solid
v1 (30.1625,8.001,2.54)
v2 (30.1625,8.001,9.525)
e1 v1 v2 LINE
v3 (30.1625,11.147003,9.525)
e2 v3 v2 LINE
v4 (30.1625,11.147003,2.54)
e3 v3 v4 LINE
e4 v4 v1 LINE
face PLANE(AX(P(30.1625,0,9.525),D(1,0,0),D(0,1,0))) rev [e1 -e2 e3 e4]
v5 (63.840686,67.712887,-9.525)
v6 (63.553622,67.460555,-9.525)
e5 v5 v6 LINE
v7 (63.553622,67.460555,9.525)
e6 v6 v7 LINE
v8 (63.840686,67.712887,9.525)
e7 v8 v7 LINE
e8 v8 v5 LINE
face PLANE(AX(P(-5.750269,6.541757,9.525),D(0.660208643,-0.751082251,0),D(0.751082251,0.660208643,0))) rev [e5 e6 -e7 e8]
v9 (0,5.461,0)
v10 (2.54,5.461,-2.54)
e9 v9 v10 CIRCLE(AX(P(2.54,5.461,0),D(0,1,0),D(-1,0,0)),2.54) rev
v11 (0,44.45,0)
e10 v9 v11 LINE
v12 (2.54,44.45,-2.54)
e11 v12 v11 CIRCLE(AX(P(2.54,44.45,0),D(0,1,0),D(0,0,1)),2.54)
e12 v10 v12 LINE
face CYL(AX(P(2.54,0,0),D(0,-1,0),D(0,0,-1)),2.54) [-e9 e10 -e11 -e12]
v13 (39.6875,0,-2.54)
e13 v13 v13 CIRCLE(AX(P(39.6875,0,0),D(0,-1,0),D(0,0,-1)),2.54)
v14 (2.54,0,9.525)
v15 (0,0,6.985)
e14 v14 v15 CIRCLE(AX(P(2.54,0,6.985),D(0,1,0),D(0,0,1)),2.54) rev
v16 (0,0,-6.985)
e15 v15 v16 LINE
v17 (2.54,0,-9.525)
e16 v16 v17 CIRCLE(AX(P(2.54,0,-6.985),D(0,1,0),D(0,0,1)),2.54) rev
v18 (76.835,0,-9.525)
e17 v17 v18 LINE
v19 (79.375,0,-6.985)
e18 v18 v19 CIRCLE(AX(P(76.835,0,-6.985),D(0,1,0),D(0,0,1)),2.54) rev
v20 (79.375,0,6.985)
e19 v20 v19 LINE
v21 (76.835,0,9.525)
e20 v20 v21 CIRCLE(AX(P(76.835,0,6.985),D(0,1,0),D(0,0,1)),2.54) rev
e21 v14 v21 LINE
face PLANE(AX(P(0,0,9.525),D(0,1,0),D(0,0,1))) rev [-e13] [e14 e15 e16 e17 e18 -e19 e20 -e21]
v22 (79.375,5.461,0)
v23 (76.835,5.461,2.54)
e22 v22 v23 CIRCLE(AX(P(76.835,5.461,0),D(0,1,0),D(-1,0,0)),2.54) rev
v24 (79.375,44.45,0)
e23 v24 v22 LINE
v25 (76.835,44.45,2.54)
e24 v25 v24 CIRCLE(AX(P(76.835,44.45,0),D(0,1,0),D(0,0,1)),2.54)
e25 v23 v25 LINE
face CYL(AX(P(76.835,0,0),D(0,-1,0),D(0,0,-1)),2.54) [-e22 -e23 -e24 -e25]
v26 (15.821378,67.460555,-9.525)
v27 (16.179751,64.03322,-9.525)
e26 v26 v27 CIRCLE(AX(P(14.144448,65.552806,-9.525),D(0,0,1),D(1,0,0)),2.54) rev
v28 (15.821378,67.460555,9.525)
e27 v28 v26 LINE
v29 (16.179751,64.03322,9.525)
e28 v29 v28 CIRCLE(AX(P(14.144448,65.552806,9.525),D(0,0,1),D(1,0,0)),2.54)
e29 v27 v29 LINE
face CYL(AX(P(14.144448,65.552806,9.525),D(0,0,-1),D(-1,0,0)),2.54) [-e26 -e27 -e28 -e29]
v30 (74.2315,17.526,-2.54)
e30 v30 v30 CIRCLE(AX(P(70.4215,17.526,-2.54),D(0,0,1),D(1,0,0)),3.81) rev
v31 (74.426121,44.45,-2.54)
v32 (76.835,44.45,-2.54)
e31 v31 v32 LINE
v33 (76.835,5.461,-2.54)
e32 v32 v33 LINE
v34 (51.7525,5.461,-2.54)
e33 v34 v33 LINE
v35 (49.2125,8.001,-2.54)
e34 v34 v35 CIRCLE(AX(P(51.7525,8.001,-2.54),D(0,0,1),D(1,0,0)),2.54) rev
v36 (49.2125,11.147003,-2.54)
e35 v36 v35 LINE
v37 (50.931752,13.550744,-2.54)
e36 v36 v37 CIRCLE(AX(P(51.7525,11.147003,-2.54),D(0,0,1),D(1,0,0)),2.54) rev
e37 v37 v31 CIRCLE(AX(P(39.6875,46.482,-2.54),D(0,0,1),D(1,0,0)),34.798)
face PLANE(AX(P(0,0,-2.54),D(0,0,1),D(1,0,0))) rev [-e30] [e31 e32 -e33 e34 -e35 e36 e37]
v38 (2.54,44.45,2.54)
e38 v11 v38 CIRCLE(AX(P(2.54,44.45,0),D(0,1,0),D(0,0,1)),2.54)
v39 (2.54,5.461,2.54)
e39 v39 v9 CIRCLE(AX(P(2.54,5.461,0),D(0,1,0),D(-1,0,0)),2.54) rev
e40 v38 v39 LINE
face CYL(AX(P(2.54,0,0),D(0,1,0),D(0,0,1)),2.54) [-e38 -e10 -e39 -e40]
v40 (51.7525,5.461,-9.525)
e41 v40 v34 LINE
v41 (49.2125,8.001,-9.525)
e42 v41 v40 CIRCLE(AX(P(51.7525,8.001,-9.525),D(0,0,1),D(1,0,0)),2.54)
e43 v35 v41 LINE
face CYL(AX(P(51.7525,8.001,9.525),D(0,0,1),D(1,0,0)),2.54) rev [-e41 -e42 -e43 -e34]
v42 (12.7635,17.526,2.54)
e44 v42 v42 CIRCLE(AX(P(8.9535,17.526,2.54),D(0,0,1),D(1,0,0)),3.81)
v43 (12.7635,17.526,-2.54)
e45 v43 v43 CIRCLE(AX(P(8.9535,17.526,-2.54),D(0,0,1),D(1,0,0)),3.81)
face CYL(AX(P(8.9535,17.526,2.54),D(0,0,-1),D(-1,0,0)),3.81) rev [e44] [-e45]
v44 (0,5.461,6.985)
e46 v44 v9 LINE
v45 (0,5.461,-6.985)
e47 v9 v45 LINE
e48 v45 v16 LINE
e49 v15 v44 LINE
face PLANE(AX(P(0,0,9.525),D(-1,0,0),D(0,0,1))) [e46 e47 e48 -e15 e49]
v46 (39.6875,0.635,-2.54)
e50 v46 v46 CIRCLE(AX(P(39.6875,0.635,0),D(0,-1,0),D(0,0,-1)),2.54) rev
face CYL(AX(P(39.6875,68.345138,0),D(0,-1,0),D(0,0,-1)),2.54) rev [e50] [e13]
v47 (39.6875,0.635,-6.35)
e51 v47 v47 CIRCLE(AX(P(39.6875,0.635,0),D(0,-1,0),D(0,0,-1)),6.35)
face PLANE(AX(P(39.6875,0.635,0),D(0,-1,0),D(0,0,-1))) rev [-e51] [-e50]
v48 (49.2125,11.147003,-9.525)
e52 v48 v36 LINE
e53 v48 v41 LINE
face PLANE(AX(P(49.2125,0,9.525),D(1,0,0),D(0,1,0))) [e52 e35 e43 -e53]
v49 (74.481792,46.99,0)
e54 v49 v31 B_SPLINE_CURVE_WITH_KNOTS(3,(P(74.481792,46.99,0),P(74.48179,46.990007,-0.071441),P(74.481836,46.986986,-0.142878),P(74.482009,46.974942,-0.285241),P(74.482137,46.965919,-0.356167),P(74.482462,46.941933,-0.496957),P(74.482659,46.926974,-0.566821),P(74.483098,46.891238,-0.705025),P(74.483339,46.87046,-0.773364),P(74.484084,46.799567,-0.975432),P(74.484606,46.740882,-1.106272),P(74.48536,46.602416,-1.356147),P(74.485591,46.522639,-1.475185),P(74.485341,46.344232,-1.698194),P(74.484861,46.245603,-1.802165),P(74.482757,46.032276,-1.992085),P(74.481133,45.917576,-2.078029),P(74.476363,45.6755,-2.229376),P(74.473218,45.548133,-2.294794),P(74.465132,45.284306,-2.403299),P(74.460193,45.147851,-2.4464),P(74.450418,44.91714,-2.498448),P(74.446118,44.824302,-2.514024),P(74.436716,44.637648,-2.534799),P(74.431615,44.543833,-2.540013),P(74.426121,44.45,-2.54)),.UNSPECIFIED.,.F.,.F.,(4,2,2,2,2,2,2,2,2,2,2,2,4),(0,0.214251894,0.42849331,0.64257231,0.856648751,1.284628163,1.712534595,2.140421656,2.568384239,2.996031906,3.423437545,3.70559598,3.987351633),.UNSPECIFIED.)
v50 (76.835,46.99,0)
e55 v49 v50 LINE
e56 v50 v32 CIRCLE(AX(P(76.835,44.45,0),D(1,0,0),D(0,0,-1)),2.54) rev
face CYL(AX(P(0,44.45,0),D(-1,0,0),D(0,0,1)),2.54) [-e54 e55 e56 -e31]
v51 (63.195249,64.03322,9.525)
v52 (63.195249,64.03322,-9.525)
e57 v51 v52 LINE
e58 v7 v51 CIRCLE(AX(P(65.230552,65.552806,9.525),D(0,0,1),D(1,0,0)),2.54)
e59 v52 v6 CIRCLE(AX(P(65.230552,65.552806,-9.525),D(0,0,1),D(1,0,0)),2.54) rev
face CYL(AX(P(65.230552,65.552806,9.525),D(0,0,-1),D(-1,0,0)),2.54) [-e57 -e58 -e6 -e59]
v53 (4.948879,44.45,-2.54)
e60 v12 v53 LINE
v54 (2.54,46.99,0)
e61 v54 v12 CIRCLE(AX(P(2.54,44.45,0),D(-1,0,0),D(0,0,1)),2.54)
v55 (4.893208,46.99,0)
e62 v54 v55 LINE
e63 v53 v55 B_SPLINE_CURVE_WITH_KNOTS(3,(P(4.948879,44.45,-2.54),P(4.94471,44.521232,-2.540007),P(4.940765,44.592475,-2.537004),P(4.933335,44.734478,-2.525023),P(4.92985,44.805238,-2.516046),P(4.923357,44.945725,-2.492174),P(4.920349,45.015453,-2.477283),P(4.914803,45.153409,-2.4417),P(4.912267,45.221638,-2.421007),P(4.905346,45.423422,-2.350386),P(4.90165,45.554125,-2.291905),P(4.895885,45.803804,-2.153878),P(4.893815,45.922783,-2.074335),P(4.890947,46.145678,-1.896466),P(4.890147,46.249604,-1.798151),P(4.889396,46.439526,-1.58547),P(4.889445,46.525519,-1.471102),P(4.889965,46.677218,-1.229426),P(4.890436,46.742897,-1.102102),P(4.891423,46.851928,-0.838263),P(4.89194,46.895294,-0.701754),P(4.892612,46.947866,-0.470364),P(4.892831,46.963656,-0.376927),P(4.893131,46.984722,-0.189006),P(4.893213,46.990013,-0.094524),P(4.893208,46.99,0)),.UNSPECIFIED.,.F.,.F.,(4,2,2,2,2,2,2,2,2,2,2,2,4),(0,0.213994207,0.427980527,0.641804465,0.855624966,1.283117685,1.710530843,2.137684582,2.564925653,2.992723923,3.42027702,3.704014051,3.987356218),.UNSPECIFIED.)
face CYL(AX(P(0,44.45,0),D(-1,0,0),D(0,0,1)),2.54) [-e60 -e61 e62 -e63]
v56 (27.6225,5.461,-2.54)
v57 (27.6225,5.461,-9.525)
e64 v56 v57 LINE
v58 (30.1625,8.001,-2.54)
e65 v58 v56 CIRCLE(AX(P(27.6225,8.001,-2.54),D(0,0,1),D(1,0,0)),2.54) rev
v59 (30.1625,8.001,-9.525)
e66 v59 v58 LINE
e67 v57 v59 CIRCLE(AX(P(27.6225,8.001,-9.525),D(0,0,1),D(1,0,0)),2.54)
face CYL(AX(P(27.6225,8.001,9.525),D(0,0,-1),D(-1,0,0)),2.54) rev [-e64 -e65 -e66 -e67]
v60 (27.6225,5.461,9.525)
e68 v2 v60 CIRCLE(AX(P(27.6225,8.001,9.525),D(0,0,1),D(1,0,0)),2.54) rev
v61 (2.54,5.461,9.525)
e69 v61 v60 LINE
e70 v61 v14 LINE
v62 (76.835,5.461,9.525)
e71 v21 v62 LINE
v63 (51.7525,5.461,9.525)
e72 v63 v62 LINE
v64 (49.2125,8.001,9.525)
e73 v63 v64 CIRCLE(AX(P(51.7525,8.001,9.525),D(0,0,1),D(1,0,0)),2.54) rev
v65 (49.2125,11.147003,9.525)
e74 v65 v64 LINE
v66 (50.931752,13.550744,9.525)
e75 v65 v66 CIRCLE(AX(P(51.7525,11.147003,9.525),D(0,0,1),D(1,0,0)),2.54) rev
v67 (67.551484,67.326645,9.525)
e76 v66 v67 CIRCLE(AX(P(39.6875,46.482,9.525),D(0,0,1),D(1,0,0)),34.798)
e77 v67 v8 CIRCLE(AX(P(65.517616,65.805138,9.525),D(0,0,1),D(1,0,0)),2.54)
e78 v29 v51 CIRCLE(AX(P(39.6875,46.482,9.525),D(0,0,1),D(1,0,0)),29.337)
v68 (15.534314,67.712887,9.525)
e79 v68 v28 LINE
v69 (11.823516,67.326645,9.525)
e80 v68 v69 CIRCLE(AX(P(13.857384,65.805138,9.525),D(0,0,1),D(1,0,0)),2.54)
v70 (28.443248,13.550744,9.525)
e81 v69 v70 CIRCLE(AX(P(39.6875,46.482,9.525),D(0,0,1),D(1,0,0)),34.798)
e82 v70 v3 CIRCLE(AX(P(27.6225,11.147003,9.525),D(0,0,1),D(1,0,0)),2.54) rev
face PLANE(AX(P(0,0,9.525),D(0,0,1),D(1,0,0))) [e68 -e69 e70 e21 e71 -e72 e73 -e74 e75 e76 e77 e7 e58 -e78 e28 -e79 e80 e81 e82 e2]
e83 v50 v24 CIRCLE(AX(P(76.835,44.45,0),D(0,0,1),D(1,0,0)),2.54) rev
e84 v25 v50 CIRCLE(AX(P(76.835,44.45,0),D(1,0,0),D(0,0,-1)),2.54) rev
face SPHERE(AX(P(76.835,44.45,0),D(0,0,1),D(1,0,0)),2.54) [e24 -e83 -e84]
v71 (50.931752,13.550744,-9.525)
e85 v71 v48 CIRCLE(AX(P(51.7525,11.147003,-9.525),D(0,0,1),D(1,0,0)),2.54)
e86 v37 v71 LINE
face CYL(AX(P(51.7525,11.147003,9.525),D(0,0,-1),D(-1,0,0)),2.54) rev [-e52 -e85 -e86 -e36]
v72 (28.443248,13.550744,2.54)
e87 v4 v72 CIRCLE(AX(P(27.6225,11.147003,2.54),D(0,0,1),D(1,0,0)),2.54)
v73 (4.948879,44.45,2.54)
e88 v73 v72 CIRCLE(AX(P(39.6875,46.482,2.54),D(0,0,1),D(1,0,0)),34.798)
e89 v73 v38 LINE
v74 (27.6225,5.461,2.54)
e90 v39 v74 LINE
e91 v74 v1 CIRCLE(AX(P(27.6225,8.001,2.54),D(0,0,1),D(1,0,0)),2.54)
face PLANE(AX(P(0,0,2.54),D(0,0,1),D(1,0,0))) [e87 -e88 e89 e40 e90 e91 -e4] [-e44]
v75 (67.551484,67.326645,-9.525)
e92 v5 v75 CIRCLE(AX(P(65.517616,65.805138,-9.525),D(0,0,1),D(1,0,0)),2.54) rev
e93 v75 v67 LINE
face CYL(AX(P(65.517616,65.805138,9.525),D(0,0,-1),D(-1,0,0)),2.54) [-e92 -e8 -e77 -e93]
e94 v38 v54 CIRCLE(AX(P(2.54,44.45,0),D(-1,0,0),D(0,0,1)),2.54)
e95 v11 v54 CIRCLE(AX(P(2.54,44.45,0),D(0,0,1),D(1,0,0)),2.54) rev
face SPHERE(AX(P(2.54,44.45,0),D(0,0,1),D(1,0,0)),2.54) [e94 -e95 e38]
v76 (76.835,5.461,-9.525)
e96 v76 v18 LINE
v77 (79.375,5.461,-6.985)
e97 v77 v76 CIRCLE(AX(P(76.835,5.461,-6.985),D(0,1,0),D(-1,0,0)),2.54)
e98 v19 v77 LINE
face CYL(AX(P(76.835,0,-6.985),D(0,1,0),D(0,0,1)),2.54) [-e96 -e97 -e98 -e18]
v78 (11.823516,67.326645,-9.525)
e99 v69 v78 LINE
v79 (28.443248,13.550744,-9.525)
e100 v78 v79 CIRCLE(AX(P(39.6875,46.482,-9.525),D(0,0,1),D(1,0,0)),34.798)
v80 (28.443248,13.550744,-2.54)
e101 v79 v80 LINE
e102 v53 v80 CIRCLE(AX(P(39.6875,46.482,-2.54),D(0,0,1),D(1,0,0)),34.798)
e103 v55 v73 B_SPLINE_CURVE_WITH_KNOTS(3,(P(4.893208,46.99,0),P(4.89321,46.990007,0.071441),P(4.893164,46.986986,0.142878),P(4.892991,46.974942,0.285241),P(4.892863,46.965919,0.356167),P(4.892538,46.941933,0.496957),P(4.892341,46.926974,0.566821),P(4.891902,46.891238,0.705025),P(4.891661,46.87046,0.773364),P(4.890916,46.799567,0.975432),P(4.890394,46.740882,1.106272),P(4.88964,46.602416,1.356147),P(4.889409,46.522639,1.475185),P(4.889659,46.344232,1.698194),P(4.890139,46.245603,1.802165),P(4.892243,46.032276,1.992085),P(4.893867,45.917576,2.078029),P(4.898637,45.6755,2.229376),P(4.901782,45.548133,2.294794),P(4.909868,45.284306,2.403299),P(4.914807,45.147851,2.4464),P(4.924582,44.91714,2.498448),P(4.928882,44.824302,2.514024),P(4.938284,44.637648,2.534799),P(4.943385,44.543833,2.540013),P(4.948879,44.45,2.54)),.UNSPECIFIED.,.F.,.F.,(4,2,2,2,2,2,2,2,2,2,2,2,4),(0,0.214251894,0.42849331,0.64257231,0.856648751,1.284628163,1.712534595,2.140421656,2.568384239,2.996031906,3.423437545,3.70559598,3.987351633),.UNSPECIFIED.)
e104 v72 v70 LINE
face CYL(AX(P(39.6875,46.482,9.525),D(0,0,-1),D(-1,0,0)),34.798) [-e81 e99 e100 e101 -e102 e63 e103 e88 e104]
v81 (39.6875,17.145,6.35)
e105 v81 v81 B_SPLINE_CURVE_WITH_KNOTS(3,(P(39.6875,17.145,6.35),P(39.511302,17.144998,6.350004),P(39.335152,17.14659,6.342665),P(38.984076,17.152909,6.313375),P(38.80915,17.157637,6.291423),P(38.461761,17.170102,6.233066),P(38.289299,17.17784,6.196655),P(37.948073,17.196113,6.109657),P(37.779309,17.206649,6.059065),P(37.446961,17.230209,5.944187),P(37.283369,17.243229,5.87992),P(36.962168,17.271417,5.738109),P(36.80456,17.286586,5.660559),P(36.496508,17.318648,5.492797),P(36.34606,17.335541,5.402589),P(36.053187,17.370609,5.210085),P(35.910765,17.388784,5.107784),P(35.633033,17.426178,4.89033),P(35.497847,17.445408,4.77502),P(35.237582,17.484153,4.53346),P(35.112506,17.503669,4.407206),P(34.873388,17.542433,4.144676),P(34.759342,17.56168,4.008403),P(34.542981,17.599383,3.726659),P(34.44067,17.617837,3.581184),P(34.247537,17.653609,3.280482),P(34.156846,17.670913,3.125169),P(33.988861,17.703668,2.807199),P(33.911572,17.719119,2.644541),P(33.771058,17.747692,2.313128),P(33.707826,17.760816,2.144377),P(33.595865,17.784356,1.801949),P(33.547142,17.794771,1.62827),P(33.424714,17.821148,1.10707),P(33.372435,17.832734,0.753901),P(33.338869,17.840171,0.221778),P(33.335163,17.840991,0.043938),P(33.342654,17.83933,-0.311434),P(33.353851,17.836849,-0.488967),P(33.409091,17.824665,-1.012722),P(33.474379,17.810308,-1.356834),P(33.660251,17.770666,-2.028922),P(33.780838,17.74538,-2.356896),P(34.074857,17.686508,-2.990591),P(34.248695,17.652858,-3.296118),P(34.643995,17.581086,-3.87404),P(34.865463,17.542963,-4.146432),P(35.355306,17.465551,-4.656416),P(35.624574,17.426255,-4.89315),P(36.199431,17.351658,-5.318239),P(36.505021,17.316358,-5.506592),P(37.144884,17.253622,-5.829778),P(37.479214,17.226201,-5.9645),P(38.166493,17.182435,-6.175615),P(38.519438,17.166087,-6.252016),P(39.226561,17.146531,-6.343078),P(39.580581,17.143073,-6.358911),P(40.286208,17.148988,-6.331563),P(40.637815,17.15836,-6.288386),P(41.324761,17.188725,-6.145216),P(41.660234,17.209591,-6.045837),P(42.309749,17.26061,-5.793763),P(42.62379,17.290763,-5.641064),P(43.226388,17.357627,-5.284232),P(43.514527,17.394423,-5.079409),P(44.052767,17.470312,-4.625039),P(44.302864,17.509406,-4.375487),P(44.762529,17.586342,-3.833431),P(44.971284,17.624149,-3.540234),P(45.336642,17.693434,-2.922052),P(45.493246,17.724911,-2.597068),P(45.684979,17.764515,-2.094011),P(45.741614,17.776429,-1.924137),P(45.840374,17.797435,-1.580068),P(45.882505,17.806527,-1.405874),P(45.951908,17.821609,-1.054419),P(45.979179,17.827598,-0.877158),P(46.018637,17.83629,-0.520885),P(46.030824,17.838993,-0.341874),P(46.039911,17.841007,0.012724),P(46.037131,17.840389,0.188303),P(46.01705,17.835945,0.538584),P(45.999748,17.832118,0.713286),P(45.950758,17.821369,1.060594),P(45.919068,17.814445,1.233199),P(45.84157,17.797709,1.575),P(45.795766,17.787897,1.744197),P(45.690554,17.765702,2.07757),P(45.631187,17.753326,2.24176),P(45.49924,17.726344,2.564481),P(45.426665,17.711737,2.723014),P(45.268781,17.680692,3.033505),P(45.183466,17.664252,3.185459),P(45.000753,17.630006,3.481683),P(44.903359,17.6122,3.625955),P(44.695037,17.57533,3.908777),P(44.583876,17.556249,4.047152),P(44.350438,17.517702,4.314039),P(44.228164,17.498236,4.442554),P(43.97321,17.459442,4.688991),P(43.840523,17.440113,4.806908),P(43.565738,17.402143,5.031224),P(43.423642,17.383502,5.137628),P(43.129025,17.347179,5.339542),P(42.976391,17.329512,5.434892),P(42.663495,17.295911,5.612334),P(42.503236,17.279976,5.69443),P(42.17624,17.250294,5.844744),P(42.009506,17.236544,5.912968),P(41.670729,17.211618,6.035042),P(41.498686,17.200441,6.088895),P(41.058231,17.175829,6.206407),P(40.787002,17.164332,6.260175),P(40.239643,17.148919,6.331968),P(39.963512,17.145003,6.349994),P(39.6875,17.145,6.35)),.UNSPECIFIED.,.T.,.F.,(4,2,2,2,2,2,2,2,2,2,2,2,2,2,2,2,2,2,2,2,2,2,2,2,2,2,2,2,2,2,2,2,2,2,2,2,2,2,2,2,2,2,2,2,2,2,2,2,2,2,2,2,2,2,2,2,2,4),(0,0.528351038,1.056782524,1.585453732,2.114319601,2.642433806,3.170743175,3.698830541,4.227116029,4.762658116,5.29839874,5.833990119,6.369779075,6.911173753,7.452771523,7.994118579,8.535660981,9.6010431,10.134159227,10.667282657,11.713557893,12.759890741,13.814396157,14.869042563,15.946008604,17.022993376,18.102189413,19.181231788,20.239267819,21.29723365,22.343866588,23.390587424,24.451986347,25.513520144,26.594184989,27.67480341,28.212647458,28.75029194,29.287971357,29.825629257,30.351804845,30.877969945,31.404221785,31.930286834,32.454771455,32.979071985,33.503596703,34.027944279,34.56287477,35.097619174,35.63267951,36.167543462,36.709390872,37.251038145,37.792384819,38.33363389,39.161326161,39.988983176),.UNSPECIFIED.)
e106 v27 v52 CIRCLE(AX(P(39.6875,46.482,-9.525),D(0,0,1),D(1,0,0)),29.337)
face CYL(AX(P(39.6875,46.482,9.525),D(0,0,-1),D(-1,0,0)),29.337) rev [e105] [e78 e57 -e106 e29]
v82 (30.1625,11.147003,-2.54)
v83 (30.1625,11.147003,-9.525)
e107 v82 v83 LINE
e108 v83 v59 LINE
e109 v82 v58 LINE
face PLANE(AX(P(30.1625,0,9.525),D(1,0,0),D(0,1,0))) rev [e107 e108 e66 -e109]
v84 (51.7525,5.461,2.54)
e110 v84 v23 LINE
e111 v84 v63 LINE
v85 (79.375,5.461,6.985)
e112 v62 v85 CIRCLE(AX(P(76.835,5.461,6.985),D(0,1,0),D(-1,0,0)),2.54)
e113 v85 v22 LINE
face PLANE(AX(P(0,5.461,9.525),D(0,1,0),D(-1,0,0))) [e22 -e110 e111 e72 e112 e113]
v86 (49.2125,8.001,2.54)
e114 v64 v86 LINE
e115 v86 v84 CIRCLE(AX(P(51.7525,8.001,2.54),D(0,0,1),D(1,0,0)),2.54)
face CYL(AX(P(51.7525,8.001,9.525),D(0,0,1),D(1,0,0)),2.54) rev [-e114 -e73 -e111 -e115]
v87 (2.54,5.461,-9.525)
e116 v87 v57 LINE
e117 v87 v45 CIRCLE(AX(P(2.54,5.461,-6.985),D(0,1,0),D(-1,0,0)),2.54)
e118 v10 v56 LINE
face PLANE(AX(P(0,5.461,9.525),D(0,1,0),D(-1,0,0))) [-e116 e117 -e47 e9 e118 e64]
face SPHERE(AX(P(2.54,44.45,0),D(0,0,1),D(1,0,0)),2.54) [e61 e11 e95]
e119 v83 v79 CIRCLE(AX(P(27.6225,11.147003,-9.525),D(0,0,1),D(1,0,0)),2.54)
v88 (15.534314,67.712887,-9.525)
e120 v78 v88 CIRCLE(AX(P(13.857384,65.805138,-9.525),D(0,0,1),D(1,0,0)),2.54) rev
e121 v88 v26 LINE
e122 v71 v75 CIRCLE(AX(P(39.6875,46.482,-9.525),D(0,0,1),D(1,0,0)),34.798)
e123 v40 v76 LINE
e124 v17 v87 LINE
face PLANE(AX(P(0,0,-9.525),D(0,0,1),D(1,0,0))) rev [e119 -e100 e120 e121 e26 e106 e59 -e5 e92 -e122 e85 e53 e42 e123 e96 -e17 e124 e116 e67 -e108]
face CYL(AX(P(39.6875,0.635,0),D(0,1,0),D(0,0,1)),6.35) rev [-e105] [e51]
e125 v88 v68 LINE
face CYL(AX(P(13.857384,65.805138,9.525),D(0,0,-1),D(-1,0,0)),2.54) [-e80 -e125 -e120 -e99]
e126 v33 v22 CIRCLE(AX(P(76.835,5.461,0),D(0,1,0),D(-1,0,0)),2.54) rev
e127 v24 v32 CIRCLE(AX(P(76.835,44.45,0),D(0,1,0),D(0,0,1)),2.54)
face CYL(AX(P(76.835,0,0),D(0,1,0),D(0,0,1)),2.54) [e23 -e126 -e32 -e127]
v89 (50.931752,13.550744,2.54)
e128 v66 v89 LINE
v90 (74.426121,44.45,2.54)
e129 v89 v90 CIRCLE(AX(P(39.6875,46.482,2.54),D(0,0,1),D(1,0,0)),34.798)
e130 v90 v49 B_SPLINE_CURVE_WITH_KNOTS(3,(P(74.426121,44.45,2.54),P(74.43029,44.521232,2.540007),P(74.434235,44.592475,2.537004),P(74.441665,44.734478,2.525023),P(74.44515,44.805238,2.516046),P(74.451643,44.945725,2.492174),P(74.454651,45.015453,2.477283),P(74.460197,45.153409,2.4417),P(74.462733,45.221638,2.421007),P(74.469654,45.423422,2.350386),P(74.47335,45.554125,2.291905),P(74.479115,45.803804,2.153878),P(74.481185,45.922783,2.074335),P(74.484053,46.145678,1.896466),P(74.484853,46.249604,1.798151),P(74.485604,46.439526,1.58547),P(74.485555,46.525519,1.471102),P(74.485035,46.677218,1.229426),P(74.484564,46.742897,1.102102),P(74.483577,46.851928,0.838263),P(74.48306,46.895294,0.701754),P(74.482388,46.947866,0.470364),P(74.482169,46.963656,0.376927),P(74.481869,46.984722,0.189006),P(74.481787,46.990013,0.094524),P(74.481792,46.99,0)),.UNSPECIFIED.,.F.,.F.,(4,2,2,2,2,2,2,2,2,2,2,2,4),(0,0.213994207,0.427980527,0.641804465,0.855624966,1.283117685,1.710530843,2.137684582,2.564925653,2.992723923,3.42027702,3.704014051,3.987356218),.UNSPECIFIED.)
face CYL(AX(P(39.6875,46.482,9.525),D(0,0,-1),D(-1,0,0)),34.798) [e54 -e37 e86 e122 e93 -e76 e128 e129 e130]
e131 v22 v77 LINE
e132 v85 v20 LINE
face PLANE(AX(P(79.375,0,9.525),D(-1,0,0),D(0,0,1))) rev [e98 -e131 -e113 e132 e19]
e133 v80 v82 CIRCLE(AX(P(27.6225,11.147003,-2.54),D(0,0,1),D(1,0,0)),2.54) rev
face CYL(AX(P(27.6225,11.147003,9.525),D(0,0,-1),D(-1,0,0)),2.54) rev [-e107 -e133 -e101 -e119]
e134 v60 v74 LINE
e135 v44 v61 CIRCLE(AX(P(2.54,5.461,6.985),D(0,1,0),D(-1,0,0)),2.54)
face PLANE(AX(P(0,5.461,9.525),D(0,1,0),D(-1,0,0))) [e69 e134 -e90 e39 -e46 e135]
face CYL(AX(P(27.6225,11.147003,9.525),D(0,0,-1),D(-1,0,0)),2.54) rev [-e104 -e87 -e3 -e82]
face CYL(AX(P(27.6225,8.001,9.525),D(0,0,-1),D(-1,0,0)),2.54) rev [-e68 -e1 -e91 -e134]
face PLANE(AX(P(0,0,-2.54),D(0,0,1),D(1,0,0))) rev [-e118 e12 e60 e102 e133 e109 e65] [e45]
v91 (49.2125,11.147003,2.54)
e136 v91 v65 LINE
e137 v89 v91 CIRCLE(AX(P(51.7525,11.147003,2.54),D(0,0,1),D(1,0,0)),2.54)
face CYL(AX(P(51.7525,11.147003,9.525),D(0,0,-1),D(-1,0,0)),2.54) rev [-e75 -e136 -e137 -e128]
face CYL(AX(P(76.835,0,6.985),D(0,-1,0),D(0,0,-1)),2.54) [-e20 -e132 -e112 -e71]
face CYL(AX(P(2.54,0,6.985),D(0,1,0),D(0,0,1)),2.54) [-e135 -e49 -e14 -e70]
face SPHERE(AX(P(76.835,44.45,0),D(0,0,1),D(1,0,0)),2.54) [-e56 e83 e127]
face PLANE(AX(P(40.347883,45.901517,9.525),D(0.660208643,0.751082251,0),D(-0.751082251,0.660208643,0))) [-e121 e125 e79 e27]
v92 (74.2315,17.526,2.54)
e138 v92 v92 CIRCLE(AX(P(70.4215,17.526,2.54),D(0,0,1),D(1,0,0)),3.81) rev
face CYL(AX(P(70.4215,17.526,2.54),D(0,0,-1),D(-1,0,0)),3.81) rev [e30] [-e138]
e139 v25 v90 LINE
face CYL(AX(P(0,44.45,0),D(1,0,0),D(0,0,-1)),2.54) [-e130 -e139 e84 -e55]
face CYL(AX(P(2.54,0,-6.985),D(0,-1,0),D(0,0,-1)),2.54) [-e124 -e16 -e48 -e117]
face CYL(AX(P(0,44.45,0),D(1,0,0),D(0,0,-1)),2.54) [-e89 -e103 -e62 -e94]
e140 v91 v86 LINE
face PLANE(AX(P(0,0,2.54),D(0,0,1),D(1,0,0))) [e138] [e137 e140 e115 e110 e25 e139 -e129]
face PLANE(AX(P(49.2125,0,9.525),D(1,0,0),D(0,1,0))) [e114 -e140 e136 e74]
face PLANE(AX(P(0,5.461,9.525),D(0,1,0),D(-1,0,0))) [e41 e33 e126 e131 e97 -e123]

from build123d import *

# Parameters (mm, degrees)
BOSS_EXTRUDE1_DEPTH = 9.525
SKETCH1_3_R         = 3.81
BOSS_EXTRUDE2_DEPTH = 2.54
FILLET1_R           = 2.54
SKETCH2_R           = 2.54
CUT_EXTRUDE1_DEPTH  = 106.176870727
SKETCH7_R           = 6.35
CUT_EXTRUDE2_DEPTH  = 18.415
FILLET2_R           = 2.54
FILLET3_R           = 2.54


with BuildPart() as part:
    # Sketch1 → Boss-Extrude1 (new, symmetric)
    with BuildSketch(Plane.XY):
        with BuildLine():
            ThreePointArc((61.722, 65.850540956), (66.416458594, 34.38975697), (39.6875, 17.145))
            Line((39.6875, 17.145), (39.6875, 0))
            Line((39.6875, 0), (79.375, 0))
            Line((79.375, 0), (79.375, 5.461))
            Line((79.375, 5.461), (49.2125, 5.461))
            Line((49.2125, 5.461), (49.2125, 13.012981804))
            ThreePointArc((49.2125, 13.012981804), (67.609880758, 25.71564604), (74.481791773, 46.99))
            ThreePointArc((74.481791773, 46.99), (72.157634164, 58.995640214), (65.823660173, 69.455940354))
            Line((65.823660173, 69.455940354), (61.722, 65.850540956))
        make_face()
        with BuildLine():
            Line((39.6875, 0), (39.6875, 17.145))
            ThreePointArc((39.6875, 17.145), (12.958541406, 34.38975697), (17.653, 65.850540956))
            Line((17.653, 65.850540956), (13.551339827, 69.455940354))
            ThreePointArc((13.551339827, 69.455940354), (7.217365836, 58.995640214), (4.893208227, 46.99))
            ThreePointArc((4.893208227, 46.99), (11.765119242, 25.71564604), (30.1625, 13.012981804))
            Line((30.1625, 13.012981804), (30.1625, 5.461))
            Line((30.1625, 5.461), (0, 5.461))
            Line((0, 5.461), (0, 0))
            Line((0, 0), (39.6875, 0))
        make_face()
    extrude(amount=BOSS_EXTRUDE1_DEPTH, both=True)

    # Sketch1<3> → Boss-Extrude2 (add, symmetric)
    # profile 1 of 2: a face of its own
    with BuildSketch(Plane.XY):
        with BuildLine():
            Line((0, 46.99), (0, 5.461))
            Line((0, 5.461), (30.1625, 5.461))
            Line((30.1625, 5.461), (30.1625, 13.012981804))
            ThreePointArc((30.1625, 13.012981804), (11.765119242, 25.71564604), (4.893208227, 46.99))
            Line((4.893208227, 46.99), (0, 46.99))
        make_face()
        with Locations((8.9535, 17.526)):
            Circle(SKETCH1_3_R, mode=Mode.SUBTRACT)
    # profile 2 of 2: a face of its own
    with BuildSketch(Plane.XY):
        with BuildLine():
            Line((49.2125, 5.461), (79.375, 5.461))
            Line((79.375, 5.461), (79.375, 46.99))
            Line((79.375, 46.99), (74.481791773, 46.99))
            ThreePointArc((74.481791773, 46.99), (67.609880758, 25.71564604), (49.2125, 13.012981804))
            Line((49.2125, 13.012981804), (49.2125, 5.461))
        make_face()
        with Locations((70.4215, 17.526)):
            Circle(SKETCH1_3_R, mode=Mode.SUBTRACT)
    extrude(amount=BOSS_EXTRUDE2_DEPTH, both=True)

    # Fillet1
    fillet1_edges = [part.edges().sort_by_distance(p)[0] for p in [
        (17.653, 65.850540956, 0),
    ]]
    fillet(fillet1_edges, radius=FILLET1_R)
    fillet1_2_edges = [part.edges().sort_by_distance(p)[0] for p in [
        (61.722, 65.850540956, 0),
    ]]
    fillet(fillet1_2_edges, radius=FILLET1_R)
    fillet1_3_edges = [part.edges().sort_by_distance(p)[0] for p in [
        (0, 2.7305, -9.525),
    ]]
    fillet(fillet1_3_edges, radius=FILLET1_R)
    fillet1_4_edges = [part.edges().sort_by_distance(p)[0] for p in [
        (79.375, 2.7305, -9.525),
    ]]
    fillet(fillet1_4_edges, radius=FILLET1_R)
    fillet1_5_edges = [part.edges().sort_by_distance(p)[0] for p in [
        (13.551339827, 69.455940354, 0),
    ]]
    fillet(fillet1_5_edges, radius=FILLET1_R)
    fillet1_6_edges = [part.edges().sort_by_distance(p)[0] for p in [
        (0, 2.7305, 9.525),
    ]]
    fillet(fillet1_6_edges, radius=FILLET1_R)
    fillet1_7_edges = [part.edges().sort_by_distance(p)[0] for p in [
        (79.375, 2.7305, 9.525),
    ]]
    fillet(fillet1_7_edges, radius=FILLET1_R)
    fillet1_8_edges = [part.edges().sort_by_distance(p)[0] for p in [
        (65.823660173, 69.455940354, 0),
    ]]
    fillet(fillet1_8_edges, radius=FILLET1_R)
    fillet1_9_edges = [part.edges().sort_by_distance(p)[0] for p in [
        (79.375, 26.2255, -2.54),
    ]]
    fillet(fillet1_9_edges, radius=FILLET1_R)
    fillet1_10_edges = [part.edges().sort_by_distance(p)[0] for p in [
        (79.375, 26.2255, 2.54),
    ]]
    fillet(fillet1_10_edges, radius=FILLET1_R - 0.0001)  # a hair under: the kernel refuses the full size
    fillet1_11_edges = [part.edges().sort_by_distance(p)[0] for p in [
        (49.2125, 13.012981804, 6.0325),
    ]]
    fillet(fillet1_11_edges, radius=FILLET1_R)
    fillet1_12_edges = [part.edges().sort_by_distance(p)[0] for p in [
        (49.2125, 5.461, 6.0325),
    ]]
    fillet(fillet1_12_edges, radius=FILLET1_R)
    fillet1_13_edges = [part.edges().sort_by_distance(p)[0] for p in [
        (75.658395887, 46.99, -2.54),
    ]]
    fillet(fillet1_13_edges, radius=FILLET1_R - 0.0001)  # a hair under: the kernel refuses the full size

    # Sketch2 → Cut-Extrude1 (cut, through all)
    with BuildSketch(Plane.XZ):
        with Locations(Location((39.6875, 0, 0), (0, 0, 270))):
            Circle(SKETCH2_R)
    extrude(amount=-CUT_EXTRUDE1_DEPTH, mode=Mode.SUBTRACT)

    # Sketch7 → Cut-Extrude2 (cut)
    with BuildSketch(Plane(origin=(0, 19.05, 0), x_dir=(-1, 0, 0), z_dir=(0, -1, 0))):
        with Locations(Location((-39.6875, 0, 0), (0, 0, 270))):
            Circle(SKETCH7_R)
    extrude(amount=CUT_EXTRUDE2_DEPTH, mode=Mode.SUBTRACT)

    # Fillet2
    fillet2_edges = [part.edges().sort_by_distance(p)[0] for p in [
        (30.1625, 5.461, 6.0325),
    ]]
    fillet(fillet2_edges, radius=FILLET2_R)
    fillet2_2_edges = [part.edges().sort_by_distance(p)[0] for p in [
        (30.1625, 13.012981804, 6.0325),
    ]]
    fillet(fillet2_2_edges, radius=FILLET2_R)
    fillet2_3_edges = [part.edges().sort_by_distance(p)[0] for p in [
        (0, 26.2255, 2.54),
    ]]
    fillet(fillet2_3_edges, radius=FILLET2_R)
    fillet2_4_edges = [part.edges().sort_by_distance(p)[0] for p in [
        (0, 26.2255, -2.54),
    ]]
    fillet(fillet2_4_edges, radius=FILLET2_R - 0.0001)  # a hair under: the kernel refuses the full size
    fillet2_5_edges = [part.edges().sort_by_distance(p)[0] for p in [
        (3.716604113, 46.99, 2.54),
    ]]
    fillet(fillet2_5_edges, radius=FILLET2_R - 0.0001)  # a hair under: the kernel refuses the full size

    # Fillet3
    fillet3_edges = [part.edges().sort_by_distance(p)[0] for p in [
        (30.1625, 5.461, -6.0325),
        (30.1625, 13.012981804, -6.0325),
        (49.2125, 13.012981804, -6.0325),
        (49.2125, 5.461, -6.0325),
    ]]
    fillet(fillet3_edges, radius=FILLET3_R)


solid = part.part
